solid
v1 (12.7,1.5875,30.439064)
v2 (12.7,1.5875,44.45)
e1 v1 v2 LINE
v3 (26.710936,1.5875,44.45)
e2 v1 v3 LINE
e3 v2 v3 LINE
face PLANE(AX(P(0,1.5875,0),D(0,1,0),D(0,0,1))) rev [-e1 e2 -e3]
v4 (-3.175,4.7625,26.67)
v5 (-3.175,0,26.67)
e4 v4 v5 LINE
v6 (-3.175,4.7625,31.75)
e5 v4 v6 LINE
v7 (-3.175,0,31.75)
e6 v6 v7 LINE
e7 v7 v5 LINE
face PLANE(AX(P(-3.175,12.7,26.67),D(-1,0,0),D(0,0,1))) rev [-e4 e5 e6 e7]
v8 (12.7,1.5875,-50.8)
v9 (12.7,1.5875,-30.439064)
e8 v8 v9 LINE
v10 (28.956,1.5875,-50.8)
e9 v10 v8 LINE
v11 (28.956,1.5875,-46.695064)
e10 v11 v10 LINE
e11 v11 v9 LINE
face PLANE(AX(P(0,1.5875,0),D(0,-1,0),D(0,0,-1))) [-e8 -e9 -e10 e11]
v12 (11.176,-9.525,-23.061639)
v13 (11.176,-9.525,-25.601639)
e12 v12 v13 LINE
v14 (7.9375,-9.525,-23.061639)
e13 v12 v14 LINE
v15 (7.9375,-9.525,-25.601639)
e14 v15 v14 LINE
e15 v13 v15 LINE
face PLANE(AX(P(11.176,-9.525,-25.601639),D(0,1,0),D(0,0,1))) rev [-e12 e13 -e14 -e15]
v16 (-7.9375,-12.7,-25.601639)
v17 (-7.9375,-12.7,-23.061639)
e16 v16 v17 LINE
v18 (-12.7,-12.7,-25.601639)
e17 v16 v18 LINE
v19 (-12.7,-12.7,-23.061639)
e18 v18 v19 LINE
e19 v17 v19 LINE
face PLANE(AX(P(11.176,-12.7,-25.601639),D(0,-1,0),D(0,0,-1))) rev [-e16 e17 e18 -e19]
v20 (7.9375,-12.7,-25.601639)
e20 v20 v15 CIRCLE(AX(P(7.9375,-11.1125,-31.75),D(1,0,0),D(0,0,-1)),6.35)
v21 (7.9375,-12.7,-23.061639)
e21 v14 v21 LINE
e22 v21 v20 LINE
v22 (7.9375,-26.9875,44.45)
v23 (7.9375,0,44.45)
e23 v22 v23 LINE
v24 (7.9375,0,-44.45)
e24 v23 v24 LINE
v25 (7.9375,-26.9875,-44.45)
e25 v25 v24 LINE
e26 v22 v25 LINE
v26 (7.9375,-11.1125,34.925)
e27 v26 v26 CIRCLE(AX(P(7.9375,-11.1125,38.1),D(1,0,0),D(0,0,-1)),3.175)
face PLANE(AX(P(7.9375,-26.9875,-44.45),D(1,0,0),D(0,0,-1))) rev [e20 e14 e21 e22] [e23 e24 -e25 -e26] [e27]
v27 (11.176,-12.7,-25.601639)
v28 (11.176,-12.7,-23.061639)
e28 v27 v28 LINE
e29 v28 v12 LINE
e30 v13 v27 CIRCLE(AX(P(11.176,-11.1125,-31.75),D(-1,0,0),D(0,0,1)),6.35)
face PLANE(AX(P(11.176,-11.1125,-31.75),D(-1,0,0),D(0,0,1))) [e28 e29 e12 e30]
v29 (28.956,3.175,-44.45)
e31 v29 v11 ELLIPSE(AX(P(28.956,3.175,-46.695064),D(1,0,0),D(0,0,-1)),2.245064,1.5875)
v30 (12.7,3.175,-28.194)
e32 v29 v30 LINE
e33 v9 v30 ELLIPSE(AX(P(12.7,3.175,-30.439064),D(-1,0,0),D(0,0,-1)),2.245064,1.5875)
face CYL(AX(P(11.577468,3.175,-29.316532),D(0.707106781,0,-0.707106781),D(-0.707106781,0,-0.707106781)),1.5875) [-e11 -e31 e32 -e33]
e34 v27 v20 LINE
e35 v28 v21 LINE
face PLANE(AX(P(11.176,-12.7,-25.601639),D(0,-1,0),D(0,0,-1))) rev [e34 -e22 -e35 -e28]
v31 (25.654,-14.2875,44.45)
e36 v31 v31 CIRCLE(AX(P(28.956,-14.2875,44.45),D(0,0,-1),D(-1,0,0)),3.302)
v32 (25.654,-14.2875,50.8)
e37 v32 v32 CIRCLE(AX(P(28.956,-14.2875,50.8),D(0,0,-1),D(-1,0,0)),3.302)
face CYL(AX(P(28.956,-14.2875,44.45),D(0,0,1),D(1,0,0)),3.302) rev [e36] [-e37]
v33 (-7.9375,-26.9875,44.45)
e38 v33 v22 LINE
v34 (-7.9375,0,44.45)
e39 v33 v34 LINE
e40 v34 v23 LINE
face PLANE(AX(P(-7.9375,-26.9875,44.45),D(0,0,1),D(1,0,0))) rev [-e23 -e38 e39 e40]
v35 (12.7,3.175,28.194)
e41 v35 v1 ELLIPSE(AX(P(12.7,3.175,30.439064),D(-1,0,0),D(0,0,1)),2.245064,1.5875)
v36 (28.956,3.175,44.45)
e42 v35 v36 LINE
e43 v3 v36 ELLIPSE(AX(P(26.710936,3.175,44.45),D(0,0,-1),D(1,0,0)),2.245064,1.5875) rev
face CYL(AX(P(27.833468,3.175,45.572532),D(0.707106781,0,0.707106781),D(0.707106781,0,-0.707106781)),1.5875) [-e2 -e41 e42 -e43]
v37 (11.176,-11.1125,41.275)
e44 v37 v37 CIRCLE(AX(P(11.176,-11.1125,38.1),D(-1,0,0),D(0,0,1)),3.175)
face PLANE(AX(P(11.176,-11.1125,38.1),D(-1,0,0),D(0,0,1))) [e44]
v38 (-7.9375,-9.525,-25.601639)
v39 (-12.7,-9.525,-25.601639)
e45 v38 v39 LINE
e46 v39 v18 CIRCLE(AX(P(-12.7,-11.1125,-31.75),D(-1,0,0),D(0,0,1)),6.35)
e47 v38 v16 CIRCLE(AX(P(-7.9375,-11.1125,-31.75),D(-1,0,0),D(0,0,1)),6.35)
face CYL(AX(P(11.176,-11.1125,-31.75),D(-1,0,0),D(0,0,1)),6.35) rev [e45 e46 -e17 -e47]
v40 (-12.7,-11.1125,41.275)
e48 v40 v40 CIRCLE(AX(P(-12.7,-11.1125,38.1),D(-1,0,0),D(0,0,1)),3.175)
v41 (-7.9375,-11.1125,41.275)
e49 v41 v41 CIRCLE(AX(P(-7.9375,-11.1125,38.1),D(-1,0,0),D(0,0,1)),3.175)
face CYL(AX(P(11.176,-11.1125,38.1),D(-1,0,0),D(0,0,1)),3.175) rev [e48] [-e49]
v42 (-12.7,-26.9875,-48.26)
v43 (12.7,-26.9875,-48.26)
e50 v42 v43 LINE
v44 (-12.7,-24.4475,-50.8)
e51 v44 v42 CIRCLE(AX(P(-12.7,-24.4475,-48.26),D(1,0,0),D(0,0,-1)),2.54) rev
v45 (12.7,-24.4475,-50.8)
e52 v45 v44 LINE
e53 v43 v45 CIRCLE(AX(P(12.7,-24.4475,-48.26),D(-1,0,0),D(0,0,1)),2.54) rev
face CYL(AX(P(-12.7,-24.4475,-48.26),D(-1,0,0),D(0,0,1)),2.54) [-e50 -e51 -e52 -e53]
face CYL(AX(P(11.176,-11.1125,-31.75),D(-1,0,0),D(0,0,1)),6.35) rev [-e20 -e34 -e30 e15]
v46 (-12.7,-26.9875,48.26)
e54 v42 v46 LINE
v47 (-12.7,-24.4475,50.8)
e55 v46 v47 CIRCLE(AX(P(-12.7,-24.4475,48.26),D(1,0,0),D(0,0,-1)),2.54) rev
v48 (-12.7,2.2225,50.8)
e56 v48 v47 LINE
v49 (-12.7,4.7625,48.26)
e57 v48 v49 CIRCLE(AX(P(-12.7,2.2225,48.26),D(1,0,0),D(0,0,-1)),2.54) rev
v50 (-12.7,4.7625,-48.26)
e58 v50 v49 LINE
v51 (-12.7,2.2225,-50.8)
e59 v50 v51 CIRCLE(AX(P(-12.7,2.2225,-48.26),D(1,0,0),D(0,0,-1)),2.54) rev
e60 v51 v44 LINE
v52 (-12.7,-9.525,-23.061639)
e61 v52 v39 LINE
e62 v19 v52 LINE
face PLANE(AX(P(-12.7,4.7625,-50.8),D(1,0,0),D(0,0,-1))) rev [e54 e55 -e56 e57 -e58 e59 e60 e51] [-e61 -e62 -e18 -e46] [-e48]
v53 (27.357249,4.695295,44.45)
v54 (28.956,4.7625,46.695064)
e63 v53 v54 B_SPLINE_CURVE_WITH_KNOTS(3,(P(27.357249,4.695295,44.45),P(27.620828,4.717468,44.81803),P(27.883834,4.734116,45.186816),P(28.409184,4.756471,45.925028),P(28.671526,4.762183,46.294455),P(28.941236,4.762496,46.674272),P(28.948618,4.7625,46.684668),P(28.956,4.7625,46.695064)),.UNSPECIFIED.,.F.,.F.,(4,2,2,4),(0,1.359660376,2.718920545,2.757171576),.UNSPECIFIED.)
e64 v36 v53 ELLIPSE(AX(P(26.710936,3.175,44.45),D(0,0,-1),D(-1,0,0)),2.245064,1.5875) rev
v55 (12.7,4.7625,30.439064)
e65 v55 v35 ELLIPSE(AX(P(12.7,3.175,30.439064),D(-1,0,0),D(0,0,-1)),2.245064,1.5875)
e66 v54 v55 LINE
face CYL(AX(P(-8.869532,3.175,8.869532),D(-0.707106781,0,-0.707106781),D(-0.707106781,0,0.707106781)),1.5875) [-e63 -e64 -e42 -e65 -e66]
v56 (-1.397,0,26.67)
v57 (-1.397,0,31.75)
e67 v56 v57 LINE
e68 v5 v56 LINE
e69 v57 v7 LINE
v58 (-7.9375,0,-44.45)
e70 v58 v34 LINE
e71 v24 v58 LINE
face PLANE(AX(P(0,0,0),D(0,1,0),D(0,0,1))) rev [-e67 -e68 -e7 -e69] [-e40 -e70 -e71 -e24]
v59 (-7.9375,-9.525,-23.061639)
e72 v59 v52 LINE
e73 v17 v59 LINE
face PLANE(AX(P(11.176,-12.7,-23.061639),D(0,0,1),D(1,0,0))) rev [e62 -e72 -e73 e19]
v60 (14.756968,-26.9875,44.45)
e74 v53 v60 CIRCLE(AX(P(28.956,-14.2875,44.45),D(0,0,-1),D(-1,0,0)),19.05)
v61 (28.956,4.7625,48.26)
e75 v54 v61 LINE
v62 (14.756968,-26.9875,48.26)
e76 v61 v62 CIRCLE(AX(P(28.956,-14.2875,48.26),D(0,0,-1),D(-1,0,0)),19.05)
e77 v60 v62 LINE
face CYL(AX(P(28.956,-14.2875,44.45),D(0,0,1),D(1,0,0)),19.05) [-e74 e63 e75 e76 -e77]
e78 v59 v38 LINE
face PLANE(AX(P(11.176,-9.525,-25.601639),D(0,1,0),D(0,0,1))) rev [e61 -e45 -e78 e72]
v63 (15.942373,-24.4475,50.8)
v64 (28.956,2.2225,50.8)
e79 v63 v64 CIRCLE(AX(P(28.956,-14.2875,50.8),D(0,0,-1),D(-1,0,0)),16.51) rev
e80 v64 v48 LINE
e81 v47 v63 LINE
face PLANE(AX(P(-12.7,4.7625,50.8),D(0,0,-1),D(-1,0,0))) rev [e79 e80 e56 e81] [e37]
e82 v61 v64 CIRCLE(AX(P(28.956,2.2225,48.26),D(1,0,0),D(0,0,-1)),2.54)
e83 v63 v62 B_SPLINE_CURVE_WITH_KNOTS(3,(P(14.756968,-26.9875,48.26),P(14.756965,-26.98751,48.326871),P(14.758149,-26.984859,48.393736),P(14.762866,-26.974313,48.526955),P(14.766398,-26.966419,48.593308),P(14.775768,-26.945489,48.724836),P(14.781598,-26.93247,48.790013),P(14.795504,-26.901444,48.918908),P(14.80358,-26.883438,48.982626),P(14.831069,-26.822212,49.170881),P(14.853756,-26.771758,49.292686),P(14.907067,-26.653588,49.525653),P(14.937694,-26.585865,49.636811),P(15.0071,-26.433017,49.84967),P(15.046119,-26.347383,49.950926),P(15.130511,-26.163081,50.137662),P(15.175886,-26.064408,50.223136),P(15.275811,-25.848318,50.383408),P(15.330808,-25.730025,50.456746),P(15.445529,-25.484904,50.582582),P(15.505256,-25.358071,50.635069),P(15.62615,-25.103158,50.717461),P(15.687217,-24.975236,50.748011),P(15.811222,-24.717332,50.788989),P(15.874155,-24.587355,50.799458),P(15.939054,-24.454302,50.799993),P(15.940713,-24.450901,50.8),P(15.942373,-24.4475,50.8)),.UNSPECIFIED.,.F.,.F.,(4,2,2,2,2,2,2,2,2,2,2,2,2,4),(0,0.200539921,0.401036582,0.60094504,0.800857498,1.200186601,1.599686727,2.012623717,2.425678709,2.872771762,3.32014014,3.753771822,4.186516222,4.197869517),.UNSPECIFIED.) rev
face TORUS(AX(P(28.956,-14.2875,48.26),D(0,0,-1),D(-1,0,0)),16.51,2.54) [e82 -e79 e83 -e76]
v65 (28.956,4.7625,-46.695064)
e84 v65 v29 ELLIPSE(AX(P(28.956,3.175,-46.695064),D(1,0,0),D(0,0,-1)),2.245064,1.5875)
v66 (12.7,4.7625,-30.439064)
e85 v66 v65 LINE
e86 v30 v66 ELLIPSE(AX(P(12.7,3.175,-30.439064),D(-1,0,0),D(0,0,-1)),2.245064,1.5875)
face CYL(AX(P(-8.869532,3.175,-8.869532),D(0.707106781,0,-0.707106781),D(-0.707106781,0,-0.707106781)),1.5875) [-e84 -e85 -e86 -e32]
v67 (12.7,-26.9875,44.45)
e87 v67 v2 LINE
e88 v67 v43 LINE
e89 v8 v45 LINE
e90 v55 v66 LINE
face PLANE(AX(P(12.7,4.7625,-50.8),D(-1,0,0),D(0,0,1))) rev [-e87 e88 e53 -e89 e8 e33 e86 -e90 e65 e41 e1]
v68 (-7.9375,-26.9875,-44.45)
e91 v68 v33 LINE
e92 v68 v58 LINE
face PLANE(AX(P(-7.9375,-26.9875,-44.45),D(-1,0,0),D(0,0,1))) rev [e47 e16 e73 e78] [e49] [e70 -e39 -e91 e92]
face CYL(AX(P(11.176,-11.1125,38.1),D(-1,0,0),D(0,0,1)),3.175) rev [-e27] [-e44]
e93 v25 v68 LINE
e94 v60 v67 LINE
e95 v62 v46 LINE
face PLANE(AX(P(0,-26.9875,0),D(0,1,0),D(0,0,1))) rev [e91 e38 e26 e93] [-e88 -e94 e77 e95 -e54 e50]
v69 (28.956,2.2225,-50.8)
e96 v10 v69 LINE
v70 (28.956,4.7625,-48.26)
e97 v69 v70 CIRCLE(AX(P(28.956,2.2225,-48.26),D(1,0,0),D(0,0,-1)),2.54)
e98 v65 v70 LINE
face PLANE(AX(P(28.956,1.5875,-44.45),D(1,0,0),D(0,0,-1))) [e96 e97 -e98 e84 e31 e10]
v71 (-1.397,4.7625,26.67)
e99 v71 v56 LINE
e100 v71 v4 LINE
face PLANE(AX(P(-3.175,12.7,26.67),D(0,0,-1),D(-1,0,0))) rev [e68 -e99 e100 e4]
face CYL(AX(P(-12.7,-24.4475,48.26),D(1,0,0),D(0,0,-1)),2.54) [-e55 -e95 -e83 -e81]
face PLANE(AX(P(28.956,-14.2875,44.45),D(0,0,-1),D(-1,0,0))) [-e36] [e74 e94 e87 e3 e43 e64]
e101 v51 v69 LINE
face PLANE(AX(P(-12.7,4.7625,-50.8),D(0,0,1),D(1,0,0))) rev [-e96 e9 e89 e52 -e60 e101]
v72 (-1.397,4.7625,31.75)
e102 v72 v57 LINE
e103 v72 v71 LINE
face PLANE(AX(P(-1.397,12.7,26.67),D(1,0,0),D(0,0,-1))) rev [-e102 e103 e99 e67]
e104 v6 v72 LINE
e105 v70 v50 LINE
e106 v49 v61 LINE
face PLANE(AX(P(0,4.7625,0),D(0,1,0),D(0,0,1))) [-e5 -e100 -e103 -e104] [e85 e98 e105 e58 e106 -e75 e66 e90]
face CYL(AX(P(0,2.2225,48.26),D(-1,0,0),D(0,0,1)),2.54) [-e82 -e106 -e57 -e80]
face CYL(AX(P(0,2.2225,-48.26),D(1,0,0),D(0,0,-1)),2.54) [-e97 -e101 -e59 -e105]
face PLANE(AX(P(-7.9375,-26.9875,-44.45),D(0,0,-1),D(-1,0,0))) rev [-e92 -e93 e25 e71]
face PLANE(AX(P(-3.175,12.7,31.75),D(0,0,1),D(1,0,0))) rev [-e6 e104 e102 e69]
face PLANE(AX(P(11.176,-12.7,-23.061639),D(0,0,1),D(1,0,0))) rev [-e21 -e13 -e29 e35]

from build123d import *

# Parameters (mm, degrees)
SKETCH1_W             = 25.4
SKETCH1_H             = 101.6
TOP_DEPTH             = 4.7625
SKETCH2_W             = 25.4
SKETCH2_H             = 101.6
SKETCH2_W_2           = 15.875
SKETCH2_H_2           = 88.9
WALLS_DEPTH           = 31.75
SKETCH9_R             = 3.302
JOINT_HINGE_DEPTH     = 6.35
SKETCH3_R             = 3.175
SHAFT_HOLES_DEPTH     = 23.876
SKETCH13_W            = 1.778
SKETCH13_H            = 5.08
WIRE_LOFT_MOUNT_DEPTH = 12.7
ANTI_FLEX_DEPTH       = 3.175
FILLET1_R             = 2.54
FILLET2_R             = 1.5875


with BuildPart() as part:
    # Sketch1 → Top (new body)
    with BuildSketch(Plane(origin=(0, 0, 0), x_dir=(1, 0, 0), z_dir=(0, 1, 0))):
        Rectangle(SKETCH1_W, SKETCH1_H)
    extrude(amount=TOP_DEPTH)

    # Sketch2 → Walls (add)
    with BuildSketch(Plane(origin=(0, 4.7625, 0), x_dir=(1, 0, 0), z_dir=(0, 1, 0))):
        Rectangle(SKETCH2_W, SKETCH2_H)
        Rectangle(SKETCH2_W_2, SKETCH2_H_2, mode=Mode.SUBTRACT)
    extrude(amount=-WALLS_DEPTH)

    # Sketch9 → Joint Hinge (add)
    with BuildSketch(Plane(origin=(0, 0, 50.8), x_dir=(-1, 0, 0), z_dir=(0, 0, -1))):
        with BuildLine():
            Line((-28.956, 4.7625), (-12.7, 4.7625))
            Line((-12.7, 4.7625), (-12.7, -26.9875))
            Line((-12.7, -26.9875), (-14.756968343, -26.9875))
            ThreePointArc((-14.756968343, -26.9875), (-46.346191201, -22.064629933), (-28.956, 4.7625))
        make_face()
        with Locations((-28.956, -14.2875)):
            Circle(SKETCH9_R, mode=Mode.SUBTRACT)
    extrude(amount=JOINT_HINGE_DEPTH)

    # Sketch3 → Shaft holes (cut)
    with BuildSketch(Plane.ZY.offset(12.7)):
        with Locations((38.1, -11.1125)):
            Circle(SKETCH3_R)
        with BuildLine():
            Line((-25.601638938, -12.7), (-23.061638938, -12.7))
            Line((-23.061638938, -12.7), (-23.061638938, -9.525))
            Line((-23.061638938, -9.525), (-25.601638938, -9.525))
            ThreePointArc((-25.601638938, -9.525), (-38.1, -11.1125), (-25.601638938, -12.7))
        make_face()
    extrude(amount=-SHAFT_HOLES_DEPTH, mode=Mode.SUBTRACT)

    # Sketch13 → Wire Loft Mount (cut)
    with BuildSketch(Plane.XZ):
        with Locations((-2.286, 29.21)):
            Rectangle(SKETCH13_W, SKETCH13_H)
    extrude(amount=-WIRE_LOFT_MOUNT_DEPTH, mode=Mode.SUBTRACT)

    # Sketch15 → Anti-flex (add)
    with BuildSketch(Plane(origin=(0, 4.7625, 0), x_dir=(1, 0, 0), z_dir=(0, 1, 0))):
        Polygon((12.7, -44.45), (28.956, -44.45), (12.7, -28.194), align=None)
        Polygon((12.7, 28.194), (28.956, 44.45), (28.956, 50.8), (12.7, 50.8), align=None)
    extrude(amount=-ANTI_FLEX_DEPTH)

    # Fillet1
    fillet1_edges = [part.edges().sort_by_distance(p)[0] for p in [
        (8.128, 4.7625, -50.8),
        (0, -26.9875, -50.8),
        (1.028484171, -26.9875, 50.8),
        (46.346191201, -22.064629933, 50.8),
        (8.128, 4.7625, 50.8),
    ]]
    fillet(fillet1_edges, radius=FILLET1_R)

    # Fillet2
    # the kernel refuses this fillet: 1.5875 mm, written as the material it takes off along each edge
    with BuildSketch(Plane(origin=(9.893669962, 1.5875, -25.387669962), x_dir=(-0.7071067811865515, 0, -0.7071067811865436), z_dir=(0.7071067811865437, 0, -0.7071067811865515))) as fillet2_piece_1_section:
        with BuildLine():
            CenterArc((FILLET2_R, FILLET2_R), FILLET2_R, 180, 90)
            Line((0, FILLET2_R), (0, 0))
            Line((0, 0), (FILLET2_R, 0))
        make_face()
    fillet2_piece_1 = extrude(amount=30.92695567, mode=Mode.PRIVATE)
    fillet2_piece_1 = split(fillet2_piece_1, bisect_by=Plane(origin=(12.7, 1.942096603, -36.823475324), z_dir=(1, 0, 0)), keep=Keep.TOP, mode=Mode.PRIVATE)
    add(fillet2_piece_1, mode=Mode.SUBTRACT)
    with BuildSketch(Plane(origin=(9.893669962, 4.7625, -25.387669962), x_dir=(-0.7071067811865515, 0, -0.7071067811865436), z_dir=(0.7071067811865437, 0, -0.7071067811865515))) as fillet2_piece_2_section:
        with BuildLine():
            CenterArc((FILLET2_R, -FILLET2_R), FILLET2_R, 90, 90)
            Line((0, -FILLET2_R), (0, 0))
            Line((0, 0), (FILLET2_R, 0))
        make_face()
    fillet2_piece_2 = extrude(amount=30.92695567, mode=Mode.PRIVATE)
    fillet2_piece_2 = split(fillet2_piece_2, bisect_by=Plane(origin=(12.7, 4.407903397, -36.823475324), z_dir=(1, 0, 0)), keep=Keep.TOP, mode=Mode.PRIVATE)
    add(fillet2_piece_2, mode=Mode.SUBTRACT)
    with BuildSketch(Plane(origin=(31.762330038, 1.5875, 47.256330038), x_dir=(-0.7071067811865436, 0, 0.7071067811865515), z_dir=(-0.7071067811865515, 0, -0.7071067811865436))) as fillet2_piece_3_section:
        with BuildLine():
            CenterArc((FILLET2_R, FILLET2_R), FILLET2_R, 180, 90)
            Line((0, FILLET2_R), (0, 0))
            Line((0, 0), (FILLET2_R, 0))
        make_face()
    fillet2_piece_3 = extrude(amount=30.92695567, mode=Mode.PRIVATE)
    fillet2_piece_3 = split(fillet2_piece_3, bisect_by=Plane(origin=(12.7, 1.946775649, 36.567113542), z_dir=(1, 0, 0)), keep=Keep.TOP, mode=Mode.PRIVATE)
    fillet2_piece_3 = split(fillet2_piece_3, bisect_by=Plane(origin=(20.582886458, 1.946775649, 44.45), z_dir=(0, 0, -1)), keep=Keep.TOP, mode=Mode.PRIVATE)
    add(fillet2_piece_3, mode=Mode.SUBTRACT)
    with BuildSketch(Plane(origin=(31.762330038, 4.7625, 47.256330038), x_dir=(-0.7071067811865436, 0, 0.7071067811865515), z_dir=(-0.7071067811865515, 0, -0.7071067811865436))) as fillet2_piece_4_section:
        with BuildLine():
            CenterArc((FILLET2_R, -FILLET2_R), FILLET2_R, 90, 90)
            Line((0, -FILLET2_R), (0, 0))
            Line((0, 0), (FILLET2_R, 0))
        make_face()
    fillet2_piece_4 = extrude(amount=30.92695567, mode=Mode.PRIVATE)
    fillet2_piece_4 = split(fillet2_piece_4, bisect_by=Plane(origin=(12.7, 4.227310256, 42.469450936), z_dir=(1, 0, 0)), keep=Keep.TOP, mode=Mode.PRIVATE)
    fillet2_piece_4 = split(fillet2_piece_4, bisect_by=Plane(origin=(26.668449599, 4.227310256, 44.45), z_dir=(0, 0, -1)), keep=Keep.TOP, mode=Mode.PRIVATE)
    add(fillet2_piece_4, mode=Mode.SUBTRACT)
    with BuildSketch(Plane(origin=(31.762330038, 4.7625, 47.256330038), x_dir=(-0.7071067811865436, 0, 0.7071067811865515), z_dir=(-0.7071067811865515, 0, -0.7071067811865436))) as fillet2_piece_5_section:
        with BuildLine():
            CenterArc((FILLET2_R, -FILLET2_R), FILLET2_R, 90, 90)
            Line((0, -FILLET2_R), (0, 0))
            Line((0, 0), (FILLET2_R, 0))
        make_face()
    fillet2_piece_5 = extrude(amount=30.92695567, mode=Mode.PRIVATE)
    fillet2_piece_5 = split(fillet2_piece_5, bisect_by=Plane(origin=(27.86835314, 4.749091996, 44.45), z_dir=(0, 0, 1)), keep=Keep.TOP, mode=Mode.PRIVATE)
    fillet2_piece_5 = fillet2_piece_5 - Plane(origin=(28.956, -14.2875, 44.898632057), x_dir=(-0.7453559924999297, -0.6666666666666669, 0), z_dir=(0, 0, 1)) * Cylinder(19.05, 69, mode=Mode.PRIVATE)
    add(fillet2_piece_5, mode=Mode.SUBTRACT)


solid = part.part
